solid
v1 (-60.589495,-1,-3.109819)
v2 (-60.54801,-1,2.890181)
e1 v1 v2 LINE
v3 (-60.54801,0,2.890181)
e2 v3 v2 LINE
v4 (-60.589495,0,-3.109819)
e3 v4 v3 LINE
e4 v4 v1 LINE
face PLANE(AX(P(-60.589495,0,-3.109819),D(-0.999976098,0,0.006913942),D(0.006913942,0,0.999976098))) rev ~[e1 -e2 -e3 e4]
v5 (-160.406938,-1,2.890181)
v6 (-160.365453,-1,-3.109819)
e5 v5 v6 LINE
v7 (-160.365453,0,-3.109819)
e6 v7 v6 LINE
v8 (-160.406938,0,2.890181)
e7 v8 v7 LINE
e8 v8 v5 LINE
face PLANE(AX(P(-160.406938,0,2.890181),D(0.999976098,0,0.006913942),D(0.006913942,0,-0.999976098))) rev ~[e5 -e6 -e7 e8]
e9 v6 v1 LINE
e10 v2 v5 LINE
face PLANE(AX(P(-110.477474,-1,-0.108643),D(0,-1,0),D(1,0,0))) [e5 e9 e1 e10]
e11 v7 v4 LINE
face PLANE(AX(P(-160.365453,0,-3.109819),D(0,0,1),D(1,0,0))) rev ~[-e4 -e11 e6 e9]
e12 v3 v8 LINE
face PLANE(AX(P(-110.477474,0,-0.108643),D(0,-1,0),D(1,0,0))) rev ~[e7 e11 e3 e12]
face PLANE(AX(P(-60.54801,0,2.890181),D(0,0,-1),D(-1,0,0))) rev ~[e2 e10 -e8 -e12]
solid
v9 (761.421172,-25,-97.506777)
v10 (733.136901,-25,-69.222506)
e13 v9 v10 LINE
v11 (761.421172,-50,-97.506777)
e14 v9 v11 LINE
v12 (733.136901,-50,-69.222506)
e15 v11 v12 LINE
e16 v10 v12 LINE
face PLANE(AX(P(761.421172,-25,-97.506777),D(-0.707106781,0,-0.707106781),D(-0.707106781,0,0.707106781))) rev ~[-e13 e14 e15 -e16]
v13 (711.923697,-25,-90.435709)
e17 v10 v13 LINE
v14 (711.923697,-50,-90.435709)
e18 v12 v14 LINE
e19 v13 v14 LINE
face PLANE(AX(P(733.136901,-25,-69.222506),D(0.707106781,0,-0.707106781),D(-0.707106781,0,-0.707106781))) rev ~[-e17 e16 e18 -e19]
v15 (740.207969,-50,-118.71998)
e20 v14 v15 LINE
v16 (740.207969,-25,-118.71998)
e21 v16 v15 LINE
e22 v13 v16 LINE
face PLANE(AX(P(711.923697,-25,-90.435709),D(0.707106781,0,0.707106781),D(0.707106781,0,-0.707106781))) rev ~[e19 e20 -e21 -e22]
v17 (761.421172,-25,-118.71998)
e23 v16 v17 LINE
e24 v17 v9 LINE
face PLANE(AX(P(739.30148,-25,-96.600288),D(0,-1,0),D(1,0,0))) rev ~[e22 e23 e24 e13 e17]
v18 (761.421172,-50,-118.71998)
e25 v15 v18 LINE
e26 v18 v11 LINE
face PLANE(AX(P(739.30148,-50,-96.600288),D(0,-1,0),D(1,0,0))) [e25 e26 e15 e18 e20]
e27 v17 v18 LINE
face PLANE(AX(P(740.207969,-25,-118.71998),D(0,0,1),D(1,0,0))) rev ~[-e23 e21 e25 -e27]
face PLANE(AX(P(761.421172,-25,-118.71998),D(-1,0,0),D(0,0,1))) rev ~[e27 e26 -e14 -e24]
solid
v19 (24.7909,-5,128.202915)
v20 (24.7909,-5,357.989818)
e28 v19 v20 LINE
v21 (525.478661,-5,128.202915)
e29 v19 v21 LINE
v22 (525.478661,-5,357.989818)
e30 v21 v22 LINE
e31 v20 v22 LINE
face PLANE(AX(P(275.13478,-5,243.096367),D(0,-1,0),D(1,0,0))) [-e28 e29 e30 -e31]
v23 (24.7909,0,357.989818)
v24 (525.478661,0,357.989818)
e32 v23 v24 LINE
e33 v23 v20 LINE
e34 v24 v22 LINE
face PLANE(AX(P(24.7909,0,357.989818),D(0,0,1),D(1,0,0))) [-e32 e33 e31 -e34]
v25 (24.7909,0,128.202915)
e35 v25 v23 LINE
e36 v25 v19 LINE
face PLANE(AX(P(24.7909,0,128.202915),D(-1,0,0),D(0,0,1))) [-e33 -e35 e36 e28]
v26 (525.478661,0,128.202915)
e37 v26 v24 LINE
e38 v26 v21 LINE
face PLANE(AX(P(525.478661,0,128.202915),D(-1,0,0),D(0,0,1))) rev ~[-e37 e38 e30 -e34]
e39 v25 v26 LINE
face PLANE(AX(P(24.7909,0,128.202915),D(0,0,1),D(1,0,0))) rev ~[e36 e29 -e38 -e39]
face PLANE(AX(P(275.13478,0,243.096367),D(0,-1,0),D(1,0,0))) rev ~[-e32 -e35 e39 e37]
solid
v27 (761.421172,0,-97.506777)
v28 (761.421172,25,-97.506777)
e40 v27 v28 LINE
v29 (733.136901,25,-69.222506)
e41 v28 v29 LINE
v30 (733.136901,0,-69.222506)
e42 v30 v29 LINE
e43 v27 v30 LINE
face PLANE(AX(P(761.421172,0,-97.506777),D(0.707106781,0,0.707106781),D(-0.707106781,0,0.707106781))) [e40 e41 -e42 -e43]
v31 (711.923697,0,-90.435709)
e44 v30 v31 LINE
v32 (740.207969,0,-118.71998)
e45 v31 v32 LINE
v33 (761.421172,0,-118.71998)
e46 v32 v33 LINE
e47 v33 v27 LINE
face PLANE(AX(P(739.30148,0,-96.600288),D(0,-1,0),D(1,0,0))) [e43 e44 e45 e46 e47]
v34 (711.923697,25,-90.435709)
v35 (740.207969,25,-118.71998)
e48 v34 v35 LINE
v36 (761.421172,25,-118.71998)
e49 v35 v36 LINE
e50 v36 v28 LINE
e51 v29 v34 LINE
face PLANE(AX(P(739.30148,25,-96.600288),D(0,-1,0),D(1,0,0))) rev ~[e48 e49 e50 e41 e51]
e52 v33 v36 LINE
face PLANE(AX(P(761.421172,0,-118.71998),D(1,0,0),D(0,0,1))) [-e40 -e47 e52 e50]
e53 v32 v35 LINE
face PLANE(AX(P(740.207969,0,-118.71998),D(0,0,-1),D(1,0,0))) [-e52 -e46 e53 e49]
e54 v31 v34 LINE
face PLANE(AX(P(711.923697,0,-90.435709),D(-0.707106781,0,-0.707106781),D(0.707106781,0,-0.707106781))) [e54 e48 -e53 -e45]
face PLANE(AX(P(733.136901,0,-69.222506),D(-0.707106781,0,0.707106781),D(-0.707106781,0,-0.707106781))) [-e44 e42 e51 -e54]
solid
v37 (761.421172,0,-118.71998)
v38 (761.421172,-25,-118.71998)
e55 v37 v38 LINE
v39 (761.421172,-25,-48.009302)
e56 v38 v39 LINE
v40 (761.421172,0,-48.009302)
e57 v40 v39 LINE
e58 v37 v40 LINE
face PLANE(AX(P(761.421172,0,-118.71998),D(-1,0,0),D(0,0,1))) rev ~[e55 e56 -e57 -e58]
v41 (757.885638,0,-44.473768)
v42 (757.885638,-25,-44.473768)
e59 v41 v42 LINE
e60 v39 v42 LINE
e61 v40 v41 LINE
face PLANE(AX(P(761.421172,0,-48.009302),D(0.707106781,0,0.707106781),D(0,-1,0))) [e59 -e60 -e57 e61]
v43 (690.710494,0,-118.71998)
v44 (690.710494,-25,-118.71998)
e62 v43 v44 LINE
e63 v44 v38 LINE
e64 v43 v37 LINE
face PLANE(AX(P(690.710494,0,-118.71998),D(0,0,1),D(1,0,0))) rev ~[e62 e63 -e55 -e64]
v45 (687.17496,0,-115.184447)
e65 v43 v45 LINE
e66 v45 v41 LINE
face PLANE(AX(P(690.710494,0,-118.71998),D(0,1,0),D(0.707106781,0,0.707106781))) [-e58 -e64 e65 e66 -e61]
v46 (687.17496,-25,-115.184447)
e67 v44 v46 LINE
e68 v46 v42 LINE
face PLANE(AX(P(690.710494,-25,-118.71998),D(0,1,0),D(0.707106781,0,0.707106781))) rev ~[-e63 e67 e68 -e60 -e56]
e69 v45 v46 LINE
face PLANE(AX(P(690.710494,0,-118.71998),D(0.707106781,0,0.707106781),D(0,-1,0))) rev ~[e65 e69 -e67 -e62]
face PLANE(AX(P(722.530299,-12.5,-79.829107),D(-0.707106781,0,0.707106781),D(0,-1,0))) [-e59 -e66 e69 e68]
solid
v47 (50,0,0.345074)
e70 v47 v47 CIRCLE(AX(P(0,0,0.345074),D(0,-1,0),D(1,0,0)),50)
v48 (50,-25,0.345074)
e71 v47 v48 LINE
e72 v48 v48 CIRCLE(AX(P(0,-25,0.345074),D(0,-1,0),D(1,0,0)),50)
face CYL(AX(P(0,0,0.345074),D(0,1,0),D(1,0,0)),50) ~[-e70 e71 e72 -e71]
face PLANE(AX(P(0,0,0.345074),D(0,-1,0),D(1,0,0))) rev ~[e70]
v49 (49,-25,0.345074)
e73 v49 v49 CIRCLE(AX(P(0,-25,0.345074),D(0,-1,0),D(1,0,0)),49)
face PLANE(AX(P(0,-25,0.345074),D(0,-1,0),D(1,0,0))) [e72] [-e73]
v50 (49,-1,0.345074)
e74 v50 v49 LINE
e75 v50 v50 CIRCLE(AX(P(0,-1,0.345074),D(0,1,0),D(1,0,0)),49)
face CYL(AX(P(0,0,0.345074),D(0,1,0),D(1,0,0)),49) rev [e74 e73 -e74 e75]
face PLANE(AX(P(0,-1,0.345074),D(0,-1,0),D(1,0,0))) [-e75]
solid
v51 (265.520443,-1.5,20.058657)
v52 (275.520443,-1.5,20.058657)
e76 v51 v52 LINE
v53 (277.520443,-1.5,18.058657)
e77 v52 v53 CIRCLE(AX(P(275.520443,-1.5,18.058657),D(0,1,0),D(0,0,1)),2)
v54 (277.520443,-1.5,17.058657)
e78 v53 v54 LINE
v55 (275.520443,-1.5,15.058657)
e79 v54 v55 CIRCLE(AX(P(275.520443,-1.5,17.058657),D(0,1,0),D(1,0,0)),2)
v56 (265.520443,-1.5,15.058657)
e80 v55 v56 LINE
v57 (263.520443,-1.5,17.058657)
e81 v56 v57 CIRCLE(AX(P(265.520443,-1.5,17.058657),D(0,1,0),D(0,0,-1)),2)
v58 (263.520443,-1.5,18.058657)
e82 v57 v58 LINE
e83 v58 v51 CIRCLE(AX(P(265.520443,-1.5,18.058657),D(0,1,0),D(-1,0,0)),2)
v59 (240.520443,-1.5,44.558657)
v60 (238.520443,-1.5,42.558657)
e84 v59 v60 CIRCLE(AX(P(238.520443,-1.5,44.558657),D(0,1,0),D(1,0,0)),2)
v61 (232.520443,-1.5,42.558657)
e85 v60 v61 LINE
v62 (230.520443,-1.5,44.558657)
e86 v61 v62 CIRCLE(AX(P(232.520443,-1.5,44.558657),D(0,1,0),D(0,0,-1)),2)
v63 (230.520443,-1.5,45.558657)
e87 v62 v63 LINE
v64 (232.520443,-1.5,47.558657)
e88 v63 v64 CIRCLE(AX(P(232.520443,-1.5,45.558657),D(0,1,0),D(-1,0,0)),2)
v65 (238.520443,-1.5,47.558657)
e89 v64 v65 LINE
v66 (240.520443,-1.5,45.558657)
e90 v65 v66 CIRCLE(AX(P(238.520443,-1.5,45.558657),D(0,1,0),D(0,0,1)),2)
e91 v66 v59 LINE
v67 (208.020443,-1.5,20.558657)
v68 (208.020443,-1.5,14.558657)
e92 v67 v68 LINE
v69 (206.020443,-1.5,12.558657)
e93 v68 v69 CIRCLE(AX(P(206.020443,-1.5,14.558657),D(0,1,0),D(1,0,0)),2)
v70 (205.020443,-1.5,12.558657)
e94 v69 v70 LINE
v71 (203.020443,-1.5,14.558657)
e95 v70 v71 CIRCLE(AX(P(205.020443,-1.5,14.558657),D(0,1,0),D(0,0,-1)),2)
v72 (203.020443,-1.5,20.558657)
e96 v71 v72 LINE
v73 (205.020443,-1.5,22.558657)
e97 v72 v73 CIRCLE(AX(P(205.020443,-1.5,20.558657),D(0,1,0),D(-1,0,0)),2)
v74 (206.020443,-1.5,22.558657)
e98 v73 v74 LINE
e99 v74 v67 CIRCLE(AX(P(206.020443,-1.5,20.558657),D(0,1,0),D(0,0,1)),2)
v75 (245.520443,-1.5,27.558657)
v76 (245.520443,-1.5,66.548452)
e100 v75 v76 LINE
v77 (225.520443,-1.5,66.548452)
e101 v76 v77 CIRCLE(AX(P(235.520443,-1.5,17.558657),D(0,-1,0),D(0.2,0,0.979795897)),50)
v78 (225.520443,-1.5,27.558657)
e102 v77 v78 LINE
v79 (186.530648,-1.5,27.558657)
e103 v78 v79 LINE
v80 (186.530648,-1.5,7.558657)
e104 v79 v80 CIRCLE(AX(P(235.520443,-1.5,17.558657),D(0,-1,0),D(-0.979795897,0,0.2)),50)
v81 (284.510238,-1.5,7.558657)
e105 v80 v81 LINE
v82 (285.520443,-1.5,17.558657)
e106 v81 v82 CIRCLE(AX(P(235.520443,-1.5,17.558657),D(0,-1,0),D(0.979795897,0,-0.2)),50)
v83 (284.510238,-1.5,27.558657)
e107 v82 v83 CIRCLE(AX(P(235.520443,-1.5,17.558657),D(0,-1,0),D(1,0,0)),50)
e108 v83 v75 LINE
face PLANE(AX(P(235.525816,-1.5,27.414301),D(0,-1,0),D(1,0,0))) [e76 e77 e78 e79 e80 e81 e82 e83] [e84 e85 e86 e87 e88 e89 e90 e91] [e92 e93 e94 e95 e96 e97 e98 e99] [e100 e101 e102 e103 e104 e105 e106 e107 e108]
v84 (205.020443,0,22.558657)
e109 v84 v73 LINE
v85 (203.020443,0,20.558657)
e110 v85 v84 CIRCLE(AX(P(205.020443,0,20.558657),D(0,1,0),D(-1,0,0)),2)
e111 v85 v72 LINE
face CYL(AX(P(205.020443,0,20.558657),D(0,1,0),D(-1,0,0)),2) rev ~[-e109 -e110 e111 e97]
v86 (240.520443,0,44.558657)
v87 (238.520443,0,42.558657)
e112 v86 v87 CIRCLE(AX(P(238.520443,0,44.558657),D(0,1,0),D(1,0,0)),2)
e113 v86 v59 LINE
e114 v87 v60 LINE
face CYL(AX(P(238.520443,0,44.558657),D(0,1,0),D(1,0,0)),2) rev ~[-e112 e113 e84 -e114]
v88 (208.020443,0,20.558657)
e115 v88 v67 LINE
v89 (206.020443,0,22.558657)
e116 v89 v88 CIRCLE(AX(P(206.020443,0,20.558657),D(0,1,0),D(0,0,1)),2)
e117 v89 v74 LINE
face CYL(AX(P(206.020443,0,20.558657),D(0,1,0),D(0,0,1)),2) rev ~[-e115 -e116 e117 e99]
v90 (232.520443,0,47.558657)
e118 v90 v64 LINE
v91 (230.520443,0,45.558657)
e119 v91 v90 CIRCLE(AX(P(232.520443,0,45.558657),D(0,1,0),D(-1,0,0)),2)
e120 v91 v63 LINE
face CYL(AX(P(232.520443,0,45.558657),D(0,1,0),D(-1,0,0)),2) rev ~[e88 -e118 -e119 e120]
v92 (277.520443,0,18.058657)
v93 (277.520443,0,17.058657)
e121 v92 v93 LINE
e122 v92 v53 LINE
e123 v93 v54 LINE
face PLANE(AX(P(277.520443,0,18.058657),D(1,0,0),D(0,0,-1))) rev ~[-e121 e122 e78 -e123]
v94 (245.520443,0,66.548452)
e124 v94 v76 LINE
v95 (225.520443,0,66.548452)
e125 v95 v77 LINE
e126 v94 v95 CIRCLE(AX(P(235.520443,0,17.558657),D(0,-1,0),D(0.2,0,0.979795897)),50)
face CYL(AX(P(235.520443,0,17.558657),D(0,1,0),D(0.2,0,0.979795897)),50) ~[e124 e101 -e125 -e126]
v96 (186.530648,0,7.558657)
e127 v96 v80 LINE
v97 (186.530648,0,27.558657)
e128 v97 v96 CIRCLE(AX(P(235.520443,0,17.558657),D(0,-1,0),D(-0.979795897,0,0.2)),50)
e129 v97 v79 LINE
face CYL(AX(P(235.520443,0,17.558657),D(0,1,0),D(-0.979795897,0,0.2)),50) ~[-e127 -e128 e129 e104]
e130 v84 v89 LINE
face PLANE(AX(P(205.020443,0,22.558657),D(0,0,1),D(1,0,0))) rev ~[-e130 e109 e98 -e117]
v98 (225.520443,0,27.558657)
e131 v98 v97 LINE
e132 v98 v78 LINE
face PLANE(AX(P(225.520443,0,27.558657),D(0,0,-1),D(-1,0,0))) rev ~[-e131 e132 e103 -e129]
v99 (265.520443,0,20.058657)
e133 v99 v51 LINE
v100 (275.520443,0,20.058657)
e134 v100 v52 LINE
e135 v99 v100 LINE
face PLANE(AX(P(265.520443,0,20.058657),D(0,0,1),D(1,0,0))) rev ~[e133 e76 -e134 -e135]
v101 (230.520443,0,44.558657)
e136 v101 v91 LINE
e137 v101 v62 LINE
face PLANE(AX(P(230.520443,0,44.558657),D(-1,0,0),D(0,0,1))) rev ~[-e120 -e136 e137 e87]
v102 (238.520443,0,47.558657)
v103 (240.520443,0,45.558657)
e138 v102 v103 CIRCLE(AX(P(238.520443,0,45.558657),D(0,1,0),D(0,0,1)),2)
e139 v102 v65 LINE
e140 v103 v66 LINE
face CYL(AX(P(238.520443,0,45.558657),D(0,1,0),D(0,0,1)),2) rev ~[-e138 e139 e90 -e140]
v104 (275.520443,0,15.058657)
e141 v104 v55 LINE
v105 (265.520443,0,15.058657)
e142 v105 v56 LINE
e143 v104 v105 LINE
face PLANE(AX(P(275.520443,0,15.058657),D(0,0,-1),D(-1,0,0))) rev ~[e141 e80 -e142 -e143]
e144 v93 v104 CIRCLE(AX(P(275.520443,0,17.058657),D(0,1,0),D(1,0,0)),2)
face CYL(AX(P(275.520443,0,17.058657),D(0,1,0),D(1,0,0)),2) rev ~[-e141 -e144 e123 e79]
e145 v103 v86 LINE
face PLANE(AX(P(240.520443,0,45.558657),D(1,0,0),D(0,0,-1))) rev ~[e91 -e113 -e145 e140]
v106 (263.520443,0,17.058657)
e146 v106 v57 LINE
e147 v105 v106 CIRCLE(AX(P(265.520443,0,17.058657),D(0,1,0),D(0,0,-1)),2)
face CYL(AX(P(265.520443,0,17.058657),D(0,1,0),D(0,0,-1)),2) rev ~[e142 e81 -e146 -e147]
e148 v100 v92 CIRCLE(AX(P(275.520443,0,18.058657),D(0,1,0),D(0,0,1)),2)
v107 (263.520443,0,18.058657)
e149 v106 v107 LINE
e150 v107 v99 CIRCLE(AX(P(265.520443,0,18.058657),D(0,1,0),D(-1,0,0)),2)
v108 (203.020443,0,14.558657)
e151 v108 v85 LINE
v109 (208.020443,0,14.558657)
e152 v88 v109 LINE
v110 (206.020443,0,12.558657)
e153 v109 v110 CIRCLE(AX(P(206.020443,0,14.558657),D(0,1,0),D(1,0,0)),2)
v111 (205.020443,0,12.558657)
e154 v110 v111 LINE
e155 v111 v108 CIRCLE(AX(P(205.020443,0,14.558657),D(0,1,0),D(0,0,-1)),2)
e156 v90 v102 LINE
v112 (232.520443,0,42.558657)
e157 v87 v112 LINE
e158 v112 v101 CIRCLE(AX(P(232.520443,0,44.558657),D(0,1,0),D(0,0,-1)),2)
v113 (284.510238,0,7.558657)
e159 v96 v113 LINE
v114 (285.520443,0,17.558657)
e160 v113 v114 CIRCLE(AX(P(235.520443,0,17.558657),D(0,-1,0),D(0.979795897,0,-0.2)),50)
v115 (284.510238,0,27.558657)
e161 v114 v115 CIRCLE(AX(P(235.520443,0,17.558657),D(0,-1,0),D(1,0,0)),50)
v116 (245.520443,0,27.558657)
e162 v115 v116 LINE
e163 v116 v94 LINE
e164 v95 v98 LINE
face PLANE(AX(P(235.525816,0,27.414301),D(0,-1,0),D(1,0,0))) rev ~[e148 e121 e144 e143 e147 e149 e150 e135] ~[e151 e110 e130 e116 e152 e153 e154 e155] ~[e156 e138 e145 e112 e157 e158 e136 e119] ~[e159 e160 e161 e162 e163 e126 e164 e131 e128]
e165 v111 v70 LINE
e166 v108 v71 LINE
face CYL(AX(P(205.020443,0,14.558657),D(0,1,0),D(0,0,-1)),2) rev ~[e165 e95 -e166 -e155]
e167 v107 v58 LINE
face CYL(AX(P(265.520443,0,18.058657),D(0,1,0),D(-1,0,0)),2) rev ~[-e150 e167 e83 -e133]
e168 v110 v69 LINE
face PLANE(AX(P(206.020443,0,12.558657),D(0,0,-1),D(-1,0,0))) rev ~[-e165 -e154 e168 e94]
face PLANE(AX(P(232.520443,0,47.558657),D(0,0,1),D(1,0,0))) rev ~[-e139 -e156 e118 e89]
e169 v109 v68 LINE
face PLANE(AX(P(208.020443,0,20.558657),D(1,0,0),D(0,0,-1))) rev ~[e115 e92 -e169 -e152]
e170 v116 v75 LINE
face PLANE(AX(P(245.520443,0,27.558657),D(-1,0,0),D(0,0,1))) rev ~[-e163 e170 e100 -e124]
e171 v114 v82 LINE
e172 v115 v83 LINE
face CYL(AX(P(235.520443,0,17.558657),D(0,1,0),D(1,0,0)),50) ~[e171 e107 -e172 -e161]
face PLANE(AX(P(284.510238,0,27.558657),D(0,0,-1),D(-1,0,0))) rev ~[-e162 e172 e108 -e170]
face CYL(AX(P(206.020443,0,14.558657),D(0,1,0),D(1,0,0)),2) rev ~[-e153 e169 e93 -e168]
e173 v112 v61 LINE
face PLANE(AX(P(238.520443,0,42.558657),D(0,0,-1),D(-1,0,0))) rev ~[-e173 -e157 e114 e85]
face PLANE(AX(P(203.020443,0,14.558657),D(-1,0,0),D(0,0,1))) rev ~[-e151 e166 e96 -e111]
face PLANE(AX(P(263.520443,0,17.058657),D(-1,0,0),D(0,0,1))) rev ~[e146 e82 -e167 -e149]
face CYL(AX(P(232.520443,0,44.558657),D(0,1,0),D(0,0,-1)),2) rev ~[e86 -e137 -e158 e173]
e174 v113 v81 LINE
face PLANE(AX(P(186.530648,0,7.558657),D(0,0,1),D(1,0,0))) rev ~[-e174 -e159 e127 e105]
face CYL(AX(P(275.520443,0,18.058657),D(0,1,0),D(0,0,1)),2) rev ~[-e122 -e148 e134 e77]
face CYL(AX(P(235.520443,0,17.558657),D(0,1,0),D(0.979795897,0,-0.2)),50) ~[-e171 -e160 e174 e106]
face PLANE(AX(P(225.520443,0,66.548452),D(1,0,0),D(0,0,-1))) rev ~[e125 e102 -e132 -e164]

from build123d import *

# Parameters (mm, degrees)
F0_R      = 50
F1_DEPTH  = 25
F2_T      = -1
F3_DEPTH  = 1
F5_DEPTH  = 1.5
F4_W      = 500.6877612323
F4_H      = 229.7869026661
F7_DEPTH  = 5
F8_DEPTH  = 25
F9_W      = 25
F9_H      = 100
F11_DEPTH = 5
F13_DEPTH = 25
F15_DEPTH = 25


# Not quite as in the source:
# - the program builds the solid bodies; features that only make, move or delete a surface that nothing else refers to are left out


with BuildPart() as f1:
    # F0 (on Front) → F1 (new body)
    with BuildSketch(Plane.XZ):
        with Locations((-2.272e-07, 0.3450742583)):
            Circle(F0_R)
    extrude(amount=F1_DEPTH)

    # F2
    f2_openings = [f1.faces().sort_by_distance(p)[0] for p in [
        (0, -25, 0.345074),
    ]]
    offset(amount=F2_T, openings=f2_openings)


with BuildPart() as f3:
    # F0 (on Front) → F3 (new body)
    with BuildSketch(Plane.XZ):
        Polygon((-60.5894945183, -3.1098189969), (-60.5480098743, 2.8901810031), (-160.4069377537, 2.8901810031), (-160.3654531097, -3.1098189969), align=None)
    extrude(amount=F3_DEPTH)


with BuildPart() as f5:
    # F4 (on Front) → F5 (new body)
    with BuildSketch(Plane.XZ):
        with BuildLine():
            Line((225.5204433411, 27.5586571583), (186.5306484854, 27.5586571583))
            ThreePointArc((186.5306484854, 27.5586571583), (185.5204433411, 17.5586571583), (186.5306484854, 7.5586571583))
            Line((186.5306484854, 7.5586571583), (284.5102381967, 7.5586571583))
            ThreePointArc((284.5102381967, 7.5586571583), (285.2672509913, 12.533209058), (285.5204433411, 17.5586571583))
            ThreePointArc((285.5204433411, 17.5586571583), (285.2672509913, 22.5841052585), (284.5102381967, 27.5586571583))
            Line((284.5102381967, 27.5586571583), (245.5204433411, 27.5586571583))
            Line((245.5204433411, 27.5586571583), (245.5204433411, 66.5484520139))
            ThreePointArc((245.5204433411, 66.5484520139), (235.5204433411, 67.5586571583), (225.5204433411, 66.5484520139))
            Line((225.5204433411, 66.5484520139), (225.5204433411, 27.5586571583))
        make_face()
        with BuildLine():
            ThreePointArc((203.0204433411, 20.5586571583), (203.6062297787, 21.9728707206), (205.0204433411, 22.5586571583))
            Line((205.0204433411, 22.5586571583), (205.5204433411, 22.5586571583))
            Line((205.5204433411, 22.5586571583), (206.0204433411, 22.5586571583))
            ThreePointArc((206.0204433411, 22.5586571583), (207.4346569034, 21.9728707206), (208.0204433411, 20.5586571583))
            Line((208.0204433411, 20.5586571583), (208.0204433411, 14.5586571583))
            ThreePointArc((208.0204433411, 14.5586571583), (207.4346569034, 13.1444435959), (206.0204433411, 12.5586571583))
            Line((206.0204433411, 12.5586571583), (205.5204433411, 12.5586571583))
            Line((205.5204433411, 12.5586571583), (205.0204433411, 12.5586571583))
            ThreePointArc((205.0204433411, 12.5586571583), (203.6062297787, 13.1444435959), (203.0204433411, 14.5586571583))
            Line((203.0204433411, 14.5586571583), (203.0204433411, 20.5586571583))
        make_face(mode=Mode.SUBTRACT)
        with BuildLine():
            ThreePointArc((275.5204433411, 20.0586571583), (276.9346569034, 19.4728707206), (277.5204433411, 18.0586571583))
            Line((277.5204433411, 18.0586571583), (277.5204433411, 17.5586571583))
            Line((277.5204433411, 17.5586571583), (277.5204433411, 17.0586571583))
            ThreePointArc((277.5204433411, 17.0586571583), (276.9346569034, 15.6444435959), (275.5204433411, 15.0586571583))
            Line((275.5204433411, 15.0586571583), (265.5204433411, 15.0586571583))
            ThreePointArc((265.5204433411, 15.0586571583), (264.1062297787, 15.6444435959), (263.5204433411, 17.0586571583))
            Line((263.5204433411, 17.0586571583), (263.5204433411, 17.5586571583))
            Line((263.5204433411, 17.5586571583), (263.5204433411, 18.0586571583))
            ThreePointArc((263.5204433411, 18.0586571583), (264.1062297787, 19.4728707206), (265.5204433411, 20.0586571583))
            Line((265.5204433411, 20.0586571583), (275.5204433411, 20.0586571583))
        make_face(mode=Mode.SUBTRACT)
        with BuildLine():
            Line((232.5204433411, 47.5586571583), (238.5204433411, 47.5586571583))
            ThreePointArc((238.5204433411, 47.5586571583), (239.9346569034, 46.9728707206), (240.5204433411, 45.5586571583))
            Line((240.5204433411, 45.5586571583), (240.5204433411, 45.0586571583))
            Line((240.5204433411, 45.0586571583), (240.5204433411, 44.5586571583))
            ThreePointArc((240.5204433411, 44.5586571583), (239.9346569034, 43.1444435959), (238.5204433411, 42.5586571583))
            Line((238.5204433411, 42.5586571583), (232.5204433411, 42.5586571583))
            ThreePointArc((232.5204433411, 42.5586571583), (231.1062297787, 43.1444435959), (230.5204433411, 44.5586571583))
            Line((230.5204433411, 44.5586571583), (230.5204433411, 45.0586571583))
            Line((230.5204433411, 45.0586571583), (230.5204433411, 45.5586571583))
            ThreePointArc((230.5204433411, 45.5586571583), (231.1062297787, 46.9728707206), (232.5204433411, 47.5586571583))
        make_face(mode=Mode.SUBTRACT)
    extrude(amount=F5_DEPTH)


with BuildPart() as f7:
    # F4 (on Front) → F7 (new body)
    with BuildSketch(Plane.XZ):
        with Locations((275.1347804442, 243.0963665247)):
            Rectangle(F4_W, F4_H)
    extrude(amount=F7_DEPTH)


with BuildPart() as f8:
    # F4 (on Front) → F8 (new body)
    with BuildSketch(Plane.XZ):
        Polygon((761.4211719814, -118.7199804553), (761.4211719814, -48.0093023367), (690.7104938628, -118.7199804553), align=None)
    extrude(amount=F8_DEPTH)

    # F9 (on face) → F11 (join)
    with BuildSketch(Plane(origin=(404.7152371591, 0, -404.7152371591), x_dir=(0, -1, 0), z_dir=(-0.7071067812, 0, 0.7071067812))):
        with Locations((12.5, 454.4583708048)):
            Rectangle(F9_W, F9_H)
    extrude(amount=F11_DEPTH)


with BuildPart() as f13:
    # F12 (on Front) → F13 (new body)
    with BuildSketch(Plane.XZ):
        Polygon((761.4211719814, -118.7199804553), (761.4211719814, -97.5067770197), (733.136900734, -69.2225057723), (711.9236972984, -90.4357092079), (740.2079685458, -118.7199804553), align=None)
    extrude(amount=-F13_DEPTH)


with BuildPart() as f15:
    # F14 (on face) → F15 (new body)
    with BuildSketch(Plane.XZ.offset(25)):
        Polygon((761.4211719814, -118.7199804553), (761.4211719814, -97.5067770197), (733.136900734, -69.2225057723), (711.9236972984, -90.4357092079), (740.2079685458, -118.7199804553), align=None)
    extrude(amount=F15_DEPTH)


solid = Compound([f1.part, f3.part, f5.part, f7.part, f8.part, f13.part, f15.part])
